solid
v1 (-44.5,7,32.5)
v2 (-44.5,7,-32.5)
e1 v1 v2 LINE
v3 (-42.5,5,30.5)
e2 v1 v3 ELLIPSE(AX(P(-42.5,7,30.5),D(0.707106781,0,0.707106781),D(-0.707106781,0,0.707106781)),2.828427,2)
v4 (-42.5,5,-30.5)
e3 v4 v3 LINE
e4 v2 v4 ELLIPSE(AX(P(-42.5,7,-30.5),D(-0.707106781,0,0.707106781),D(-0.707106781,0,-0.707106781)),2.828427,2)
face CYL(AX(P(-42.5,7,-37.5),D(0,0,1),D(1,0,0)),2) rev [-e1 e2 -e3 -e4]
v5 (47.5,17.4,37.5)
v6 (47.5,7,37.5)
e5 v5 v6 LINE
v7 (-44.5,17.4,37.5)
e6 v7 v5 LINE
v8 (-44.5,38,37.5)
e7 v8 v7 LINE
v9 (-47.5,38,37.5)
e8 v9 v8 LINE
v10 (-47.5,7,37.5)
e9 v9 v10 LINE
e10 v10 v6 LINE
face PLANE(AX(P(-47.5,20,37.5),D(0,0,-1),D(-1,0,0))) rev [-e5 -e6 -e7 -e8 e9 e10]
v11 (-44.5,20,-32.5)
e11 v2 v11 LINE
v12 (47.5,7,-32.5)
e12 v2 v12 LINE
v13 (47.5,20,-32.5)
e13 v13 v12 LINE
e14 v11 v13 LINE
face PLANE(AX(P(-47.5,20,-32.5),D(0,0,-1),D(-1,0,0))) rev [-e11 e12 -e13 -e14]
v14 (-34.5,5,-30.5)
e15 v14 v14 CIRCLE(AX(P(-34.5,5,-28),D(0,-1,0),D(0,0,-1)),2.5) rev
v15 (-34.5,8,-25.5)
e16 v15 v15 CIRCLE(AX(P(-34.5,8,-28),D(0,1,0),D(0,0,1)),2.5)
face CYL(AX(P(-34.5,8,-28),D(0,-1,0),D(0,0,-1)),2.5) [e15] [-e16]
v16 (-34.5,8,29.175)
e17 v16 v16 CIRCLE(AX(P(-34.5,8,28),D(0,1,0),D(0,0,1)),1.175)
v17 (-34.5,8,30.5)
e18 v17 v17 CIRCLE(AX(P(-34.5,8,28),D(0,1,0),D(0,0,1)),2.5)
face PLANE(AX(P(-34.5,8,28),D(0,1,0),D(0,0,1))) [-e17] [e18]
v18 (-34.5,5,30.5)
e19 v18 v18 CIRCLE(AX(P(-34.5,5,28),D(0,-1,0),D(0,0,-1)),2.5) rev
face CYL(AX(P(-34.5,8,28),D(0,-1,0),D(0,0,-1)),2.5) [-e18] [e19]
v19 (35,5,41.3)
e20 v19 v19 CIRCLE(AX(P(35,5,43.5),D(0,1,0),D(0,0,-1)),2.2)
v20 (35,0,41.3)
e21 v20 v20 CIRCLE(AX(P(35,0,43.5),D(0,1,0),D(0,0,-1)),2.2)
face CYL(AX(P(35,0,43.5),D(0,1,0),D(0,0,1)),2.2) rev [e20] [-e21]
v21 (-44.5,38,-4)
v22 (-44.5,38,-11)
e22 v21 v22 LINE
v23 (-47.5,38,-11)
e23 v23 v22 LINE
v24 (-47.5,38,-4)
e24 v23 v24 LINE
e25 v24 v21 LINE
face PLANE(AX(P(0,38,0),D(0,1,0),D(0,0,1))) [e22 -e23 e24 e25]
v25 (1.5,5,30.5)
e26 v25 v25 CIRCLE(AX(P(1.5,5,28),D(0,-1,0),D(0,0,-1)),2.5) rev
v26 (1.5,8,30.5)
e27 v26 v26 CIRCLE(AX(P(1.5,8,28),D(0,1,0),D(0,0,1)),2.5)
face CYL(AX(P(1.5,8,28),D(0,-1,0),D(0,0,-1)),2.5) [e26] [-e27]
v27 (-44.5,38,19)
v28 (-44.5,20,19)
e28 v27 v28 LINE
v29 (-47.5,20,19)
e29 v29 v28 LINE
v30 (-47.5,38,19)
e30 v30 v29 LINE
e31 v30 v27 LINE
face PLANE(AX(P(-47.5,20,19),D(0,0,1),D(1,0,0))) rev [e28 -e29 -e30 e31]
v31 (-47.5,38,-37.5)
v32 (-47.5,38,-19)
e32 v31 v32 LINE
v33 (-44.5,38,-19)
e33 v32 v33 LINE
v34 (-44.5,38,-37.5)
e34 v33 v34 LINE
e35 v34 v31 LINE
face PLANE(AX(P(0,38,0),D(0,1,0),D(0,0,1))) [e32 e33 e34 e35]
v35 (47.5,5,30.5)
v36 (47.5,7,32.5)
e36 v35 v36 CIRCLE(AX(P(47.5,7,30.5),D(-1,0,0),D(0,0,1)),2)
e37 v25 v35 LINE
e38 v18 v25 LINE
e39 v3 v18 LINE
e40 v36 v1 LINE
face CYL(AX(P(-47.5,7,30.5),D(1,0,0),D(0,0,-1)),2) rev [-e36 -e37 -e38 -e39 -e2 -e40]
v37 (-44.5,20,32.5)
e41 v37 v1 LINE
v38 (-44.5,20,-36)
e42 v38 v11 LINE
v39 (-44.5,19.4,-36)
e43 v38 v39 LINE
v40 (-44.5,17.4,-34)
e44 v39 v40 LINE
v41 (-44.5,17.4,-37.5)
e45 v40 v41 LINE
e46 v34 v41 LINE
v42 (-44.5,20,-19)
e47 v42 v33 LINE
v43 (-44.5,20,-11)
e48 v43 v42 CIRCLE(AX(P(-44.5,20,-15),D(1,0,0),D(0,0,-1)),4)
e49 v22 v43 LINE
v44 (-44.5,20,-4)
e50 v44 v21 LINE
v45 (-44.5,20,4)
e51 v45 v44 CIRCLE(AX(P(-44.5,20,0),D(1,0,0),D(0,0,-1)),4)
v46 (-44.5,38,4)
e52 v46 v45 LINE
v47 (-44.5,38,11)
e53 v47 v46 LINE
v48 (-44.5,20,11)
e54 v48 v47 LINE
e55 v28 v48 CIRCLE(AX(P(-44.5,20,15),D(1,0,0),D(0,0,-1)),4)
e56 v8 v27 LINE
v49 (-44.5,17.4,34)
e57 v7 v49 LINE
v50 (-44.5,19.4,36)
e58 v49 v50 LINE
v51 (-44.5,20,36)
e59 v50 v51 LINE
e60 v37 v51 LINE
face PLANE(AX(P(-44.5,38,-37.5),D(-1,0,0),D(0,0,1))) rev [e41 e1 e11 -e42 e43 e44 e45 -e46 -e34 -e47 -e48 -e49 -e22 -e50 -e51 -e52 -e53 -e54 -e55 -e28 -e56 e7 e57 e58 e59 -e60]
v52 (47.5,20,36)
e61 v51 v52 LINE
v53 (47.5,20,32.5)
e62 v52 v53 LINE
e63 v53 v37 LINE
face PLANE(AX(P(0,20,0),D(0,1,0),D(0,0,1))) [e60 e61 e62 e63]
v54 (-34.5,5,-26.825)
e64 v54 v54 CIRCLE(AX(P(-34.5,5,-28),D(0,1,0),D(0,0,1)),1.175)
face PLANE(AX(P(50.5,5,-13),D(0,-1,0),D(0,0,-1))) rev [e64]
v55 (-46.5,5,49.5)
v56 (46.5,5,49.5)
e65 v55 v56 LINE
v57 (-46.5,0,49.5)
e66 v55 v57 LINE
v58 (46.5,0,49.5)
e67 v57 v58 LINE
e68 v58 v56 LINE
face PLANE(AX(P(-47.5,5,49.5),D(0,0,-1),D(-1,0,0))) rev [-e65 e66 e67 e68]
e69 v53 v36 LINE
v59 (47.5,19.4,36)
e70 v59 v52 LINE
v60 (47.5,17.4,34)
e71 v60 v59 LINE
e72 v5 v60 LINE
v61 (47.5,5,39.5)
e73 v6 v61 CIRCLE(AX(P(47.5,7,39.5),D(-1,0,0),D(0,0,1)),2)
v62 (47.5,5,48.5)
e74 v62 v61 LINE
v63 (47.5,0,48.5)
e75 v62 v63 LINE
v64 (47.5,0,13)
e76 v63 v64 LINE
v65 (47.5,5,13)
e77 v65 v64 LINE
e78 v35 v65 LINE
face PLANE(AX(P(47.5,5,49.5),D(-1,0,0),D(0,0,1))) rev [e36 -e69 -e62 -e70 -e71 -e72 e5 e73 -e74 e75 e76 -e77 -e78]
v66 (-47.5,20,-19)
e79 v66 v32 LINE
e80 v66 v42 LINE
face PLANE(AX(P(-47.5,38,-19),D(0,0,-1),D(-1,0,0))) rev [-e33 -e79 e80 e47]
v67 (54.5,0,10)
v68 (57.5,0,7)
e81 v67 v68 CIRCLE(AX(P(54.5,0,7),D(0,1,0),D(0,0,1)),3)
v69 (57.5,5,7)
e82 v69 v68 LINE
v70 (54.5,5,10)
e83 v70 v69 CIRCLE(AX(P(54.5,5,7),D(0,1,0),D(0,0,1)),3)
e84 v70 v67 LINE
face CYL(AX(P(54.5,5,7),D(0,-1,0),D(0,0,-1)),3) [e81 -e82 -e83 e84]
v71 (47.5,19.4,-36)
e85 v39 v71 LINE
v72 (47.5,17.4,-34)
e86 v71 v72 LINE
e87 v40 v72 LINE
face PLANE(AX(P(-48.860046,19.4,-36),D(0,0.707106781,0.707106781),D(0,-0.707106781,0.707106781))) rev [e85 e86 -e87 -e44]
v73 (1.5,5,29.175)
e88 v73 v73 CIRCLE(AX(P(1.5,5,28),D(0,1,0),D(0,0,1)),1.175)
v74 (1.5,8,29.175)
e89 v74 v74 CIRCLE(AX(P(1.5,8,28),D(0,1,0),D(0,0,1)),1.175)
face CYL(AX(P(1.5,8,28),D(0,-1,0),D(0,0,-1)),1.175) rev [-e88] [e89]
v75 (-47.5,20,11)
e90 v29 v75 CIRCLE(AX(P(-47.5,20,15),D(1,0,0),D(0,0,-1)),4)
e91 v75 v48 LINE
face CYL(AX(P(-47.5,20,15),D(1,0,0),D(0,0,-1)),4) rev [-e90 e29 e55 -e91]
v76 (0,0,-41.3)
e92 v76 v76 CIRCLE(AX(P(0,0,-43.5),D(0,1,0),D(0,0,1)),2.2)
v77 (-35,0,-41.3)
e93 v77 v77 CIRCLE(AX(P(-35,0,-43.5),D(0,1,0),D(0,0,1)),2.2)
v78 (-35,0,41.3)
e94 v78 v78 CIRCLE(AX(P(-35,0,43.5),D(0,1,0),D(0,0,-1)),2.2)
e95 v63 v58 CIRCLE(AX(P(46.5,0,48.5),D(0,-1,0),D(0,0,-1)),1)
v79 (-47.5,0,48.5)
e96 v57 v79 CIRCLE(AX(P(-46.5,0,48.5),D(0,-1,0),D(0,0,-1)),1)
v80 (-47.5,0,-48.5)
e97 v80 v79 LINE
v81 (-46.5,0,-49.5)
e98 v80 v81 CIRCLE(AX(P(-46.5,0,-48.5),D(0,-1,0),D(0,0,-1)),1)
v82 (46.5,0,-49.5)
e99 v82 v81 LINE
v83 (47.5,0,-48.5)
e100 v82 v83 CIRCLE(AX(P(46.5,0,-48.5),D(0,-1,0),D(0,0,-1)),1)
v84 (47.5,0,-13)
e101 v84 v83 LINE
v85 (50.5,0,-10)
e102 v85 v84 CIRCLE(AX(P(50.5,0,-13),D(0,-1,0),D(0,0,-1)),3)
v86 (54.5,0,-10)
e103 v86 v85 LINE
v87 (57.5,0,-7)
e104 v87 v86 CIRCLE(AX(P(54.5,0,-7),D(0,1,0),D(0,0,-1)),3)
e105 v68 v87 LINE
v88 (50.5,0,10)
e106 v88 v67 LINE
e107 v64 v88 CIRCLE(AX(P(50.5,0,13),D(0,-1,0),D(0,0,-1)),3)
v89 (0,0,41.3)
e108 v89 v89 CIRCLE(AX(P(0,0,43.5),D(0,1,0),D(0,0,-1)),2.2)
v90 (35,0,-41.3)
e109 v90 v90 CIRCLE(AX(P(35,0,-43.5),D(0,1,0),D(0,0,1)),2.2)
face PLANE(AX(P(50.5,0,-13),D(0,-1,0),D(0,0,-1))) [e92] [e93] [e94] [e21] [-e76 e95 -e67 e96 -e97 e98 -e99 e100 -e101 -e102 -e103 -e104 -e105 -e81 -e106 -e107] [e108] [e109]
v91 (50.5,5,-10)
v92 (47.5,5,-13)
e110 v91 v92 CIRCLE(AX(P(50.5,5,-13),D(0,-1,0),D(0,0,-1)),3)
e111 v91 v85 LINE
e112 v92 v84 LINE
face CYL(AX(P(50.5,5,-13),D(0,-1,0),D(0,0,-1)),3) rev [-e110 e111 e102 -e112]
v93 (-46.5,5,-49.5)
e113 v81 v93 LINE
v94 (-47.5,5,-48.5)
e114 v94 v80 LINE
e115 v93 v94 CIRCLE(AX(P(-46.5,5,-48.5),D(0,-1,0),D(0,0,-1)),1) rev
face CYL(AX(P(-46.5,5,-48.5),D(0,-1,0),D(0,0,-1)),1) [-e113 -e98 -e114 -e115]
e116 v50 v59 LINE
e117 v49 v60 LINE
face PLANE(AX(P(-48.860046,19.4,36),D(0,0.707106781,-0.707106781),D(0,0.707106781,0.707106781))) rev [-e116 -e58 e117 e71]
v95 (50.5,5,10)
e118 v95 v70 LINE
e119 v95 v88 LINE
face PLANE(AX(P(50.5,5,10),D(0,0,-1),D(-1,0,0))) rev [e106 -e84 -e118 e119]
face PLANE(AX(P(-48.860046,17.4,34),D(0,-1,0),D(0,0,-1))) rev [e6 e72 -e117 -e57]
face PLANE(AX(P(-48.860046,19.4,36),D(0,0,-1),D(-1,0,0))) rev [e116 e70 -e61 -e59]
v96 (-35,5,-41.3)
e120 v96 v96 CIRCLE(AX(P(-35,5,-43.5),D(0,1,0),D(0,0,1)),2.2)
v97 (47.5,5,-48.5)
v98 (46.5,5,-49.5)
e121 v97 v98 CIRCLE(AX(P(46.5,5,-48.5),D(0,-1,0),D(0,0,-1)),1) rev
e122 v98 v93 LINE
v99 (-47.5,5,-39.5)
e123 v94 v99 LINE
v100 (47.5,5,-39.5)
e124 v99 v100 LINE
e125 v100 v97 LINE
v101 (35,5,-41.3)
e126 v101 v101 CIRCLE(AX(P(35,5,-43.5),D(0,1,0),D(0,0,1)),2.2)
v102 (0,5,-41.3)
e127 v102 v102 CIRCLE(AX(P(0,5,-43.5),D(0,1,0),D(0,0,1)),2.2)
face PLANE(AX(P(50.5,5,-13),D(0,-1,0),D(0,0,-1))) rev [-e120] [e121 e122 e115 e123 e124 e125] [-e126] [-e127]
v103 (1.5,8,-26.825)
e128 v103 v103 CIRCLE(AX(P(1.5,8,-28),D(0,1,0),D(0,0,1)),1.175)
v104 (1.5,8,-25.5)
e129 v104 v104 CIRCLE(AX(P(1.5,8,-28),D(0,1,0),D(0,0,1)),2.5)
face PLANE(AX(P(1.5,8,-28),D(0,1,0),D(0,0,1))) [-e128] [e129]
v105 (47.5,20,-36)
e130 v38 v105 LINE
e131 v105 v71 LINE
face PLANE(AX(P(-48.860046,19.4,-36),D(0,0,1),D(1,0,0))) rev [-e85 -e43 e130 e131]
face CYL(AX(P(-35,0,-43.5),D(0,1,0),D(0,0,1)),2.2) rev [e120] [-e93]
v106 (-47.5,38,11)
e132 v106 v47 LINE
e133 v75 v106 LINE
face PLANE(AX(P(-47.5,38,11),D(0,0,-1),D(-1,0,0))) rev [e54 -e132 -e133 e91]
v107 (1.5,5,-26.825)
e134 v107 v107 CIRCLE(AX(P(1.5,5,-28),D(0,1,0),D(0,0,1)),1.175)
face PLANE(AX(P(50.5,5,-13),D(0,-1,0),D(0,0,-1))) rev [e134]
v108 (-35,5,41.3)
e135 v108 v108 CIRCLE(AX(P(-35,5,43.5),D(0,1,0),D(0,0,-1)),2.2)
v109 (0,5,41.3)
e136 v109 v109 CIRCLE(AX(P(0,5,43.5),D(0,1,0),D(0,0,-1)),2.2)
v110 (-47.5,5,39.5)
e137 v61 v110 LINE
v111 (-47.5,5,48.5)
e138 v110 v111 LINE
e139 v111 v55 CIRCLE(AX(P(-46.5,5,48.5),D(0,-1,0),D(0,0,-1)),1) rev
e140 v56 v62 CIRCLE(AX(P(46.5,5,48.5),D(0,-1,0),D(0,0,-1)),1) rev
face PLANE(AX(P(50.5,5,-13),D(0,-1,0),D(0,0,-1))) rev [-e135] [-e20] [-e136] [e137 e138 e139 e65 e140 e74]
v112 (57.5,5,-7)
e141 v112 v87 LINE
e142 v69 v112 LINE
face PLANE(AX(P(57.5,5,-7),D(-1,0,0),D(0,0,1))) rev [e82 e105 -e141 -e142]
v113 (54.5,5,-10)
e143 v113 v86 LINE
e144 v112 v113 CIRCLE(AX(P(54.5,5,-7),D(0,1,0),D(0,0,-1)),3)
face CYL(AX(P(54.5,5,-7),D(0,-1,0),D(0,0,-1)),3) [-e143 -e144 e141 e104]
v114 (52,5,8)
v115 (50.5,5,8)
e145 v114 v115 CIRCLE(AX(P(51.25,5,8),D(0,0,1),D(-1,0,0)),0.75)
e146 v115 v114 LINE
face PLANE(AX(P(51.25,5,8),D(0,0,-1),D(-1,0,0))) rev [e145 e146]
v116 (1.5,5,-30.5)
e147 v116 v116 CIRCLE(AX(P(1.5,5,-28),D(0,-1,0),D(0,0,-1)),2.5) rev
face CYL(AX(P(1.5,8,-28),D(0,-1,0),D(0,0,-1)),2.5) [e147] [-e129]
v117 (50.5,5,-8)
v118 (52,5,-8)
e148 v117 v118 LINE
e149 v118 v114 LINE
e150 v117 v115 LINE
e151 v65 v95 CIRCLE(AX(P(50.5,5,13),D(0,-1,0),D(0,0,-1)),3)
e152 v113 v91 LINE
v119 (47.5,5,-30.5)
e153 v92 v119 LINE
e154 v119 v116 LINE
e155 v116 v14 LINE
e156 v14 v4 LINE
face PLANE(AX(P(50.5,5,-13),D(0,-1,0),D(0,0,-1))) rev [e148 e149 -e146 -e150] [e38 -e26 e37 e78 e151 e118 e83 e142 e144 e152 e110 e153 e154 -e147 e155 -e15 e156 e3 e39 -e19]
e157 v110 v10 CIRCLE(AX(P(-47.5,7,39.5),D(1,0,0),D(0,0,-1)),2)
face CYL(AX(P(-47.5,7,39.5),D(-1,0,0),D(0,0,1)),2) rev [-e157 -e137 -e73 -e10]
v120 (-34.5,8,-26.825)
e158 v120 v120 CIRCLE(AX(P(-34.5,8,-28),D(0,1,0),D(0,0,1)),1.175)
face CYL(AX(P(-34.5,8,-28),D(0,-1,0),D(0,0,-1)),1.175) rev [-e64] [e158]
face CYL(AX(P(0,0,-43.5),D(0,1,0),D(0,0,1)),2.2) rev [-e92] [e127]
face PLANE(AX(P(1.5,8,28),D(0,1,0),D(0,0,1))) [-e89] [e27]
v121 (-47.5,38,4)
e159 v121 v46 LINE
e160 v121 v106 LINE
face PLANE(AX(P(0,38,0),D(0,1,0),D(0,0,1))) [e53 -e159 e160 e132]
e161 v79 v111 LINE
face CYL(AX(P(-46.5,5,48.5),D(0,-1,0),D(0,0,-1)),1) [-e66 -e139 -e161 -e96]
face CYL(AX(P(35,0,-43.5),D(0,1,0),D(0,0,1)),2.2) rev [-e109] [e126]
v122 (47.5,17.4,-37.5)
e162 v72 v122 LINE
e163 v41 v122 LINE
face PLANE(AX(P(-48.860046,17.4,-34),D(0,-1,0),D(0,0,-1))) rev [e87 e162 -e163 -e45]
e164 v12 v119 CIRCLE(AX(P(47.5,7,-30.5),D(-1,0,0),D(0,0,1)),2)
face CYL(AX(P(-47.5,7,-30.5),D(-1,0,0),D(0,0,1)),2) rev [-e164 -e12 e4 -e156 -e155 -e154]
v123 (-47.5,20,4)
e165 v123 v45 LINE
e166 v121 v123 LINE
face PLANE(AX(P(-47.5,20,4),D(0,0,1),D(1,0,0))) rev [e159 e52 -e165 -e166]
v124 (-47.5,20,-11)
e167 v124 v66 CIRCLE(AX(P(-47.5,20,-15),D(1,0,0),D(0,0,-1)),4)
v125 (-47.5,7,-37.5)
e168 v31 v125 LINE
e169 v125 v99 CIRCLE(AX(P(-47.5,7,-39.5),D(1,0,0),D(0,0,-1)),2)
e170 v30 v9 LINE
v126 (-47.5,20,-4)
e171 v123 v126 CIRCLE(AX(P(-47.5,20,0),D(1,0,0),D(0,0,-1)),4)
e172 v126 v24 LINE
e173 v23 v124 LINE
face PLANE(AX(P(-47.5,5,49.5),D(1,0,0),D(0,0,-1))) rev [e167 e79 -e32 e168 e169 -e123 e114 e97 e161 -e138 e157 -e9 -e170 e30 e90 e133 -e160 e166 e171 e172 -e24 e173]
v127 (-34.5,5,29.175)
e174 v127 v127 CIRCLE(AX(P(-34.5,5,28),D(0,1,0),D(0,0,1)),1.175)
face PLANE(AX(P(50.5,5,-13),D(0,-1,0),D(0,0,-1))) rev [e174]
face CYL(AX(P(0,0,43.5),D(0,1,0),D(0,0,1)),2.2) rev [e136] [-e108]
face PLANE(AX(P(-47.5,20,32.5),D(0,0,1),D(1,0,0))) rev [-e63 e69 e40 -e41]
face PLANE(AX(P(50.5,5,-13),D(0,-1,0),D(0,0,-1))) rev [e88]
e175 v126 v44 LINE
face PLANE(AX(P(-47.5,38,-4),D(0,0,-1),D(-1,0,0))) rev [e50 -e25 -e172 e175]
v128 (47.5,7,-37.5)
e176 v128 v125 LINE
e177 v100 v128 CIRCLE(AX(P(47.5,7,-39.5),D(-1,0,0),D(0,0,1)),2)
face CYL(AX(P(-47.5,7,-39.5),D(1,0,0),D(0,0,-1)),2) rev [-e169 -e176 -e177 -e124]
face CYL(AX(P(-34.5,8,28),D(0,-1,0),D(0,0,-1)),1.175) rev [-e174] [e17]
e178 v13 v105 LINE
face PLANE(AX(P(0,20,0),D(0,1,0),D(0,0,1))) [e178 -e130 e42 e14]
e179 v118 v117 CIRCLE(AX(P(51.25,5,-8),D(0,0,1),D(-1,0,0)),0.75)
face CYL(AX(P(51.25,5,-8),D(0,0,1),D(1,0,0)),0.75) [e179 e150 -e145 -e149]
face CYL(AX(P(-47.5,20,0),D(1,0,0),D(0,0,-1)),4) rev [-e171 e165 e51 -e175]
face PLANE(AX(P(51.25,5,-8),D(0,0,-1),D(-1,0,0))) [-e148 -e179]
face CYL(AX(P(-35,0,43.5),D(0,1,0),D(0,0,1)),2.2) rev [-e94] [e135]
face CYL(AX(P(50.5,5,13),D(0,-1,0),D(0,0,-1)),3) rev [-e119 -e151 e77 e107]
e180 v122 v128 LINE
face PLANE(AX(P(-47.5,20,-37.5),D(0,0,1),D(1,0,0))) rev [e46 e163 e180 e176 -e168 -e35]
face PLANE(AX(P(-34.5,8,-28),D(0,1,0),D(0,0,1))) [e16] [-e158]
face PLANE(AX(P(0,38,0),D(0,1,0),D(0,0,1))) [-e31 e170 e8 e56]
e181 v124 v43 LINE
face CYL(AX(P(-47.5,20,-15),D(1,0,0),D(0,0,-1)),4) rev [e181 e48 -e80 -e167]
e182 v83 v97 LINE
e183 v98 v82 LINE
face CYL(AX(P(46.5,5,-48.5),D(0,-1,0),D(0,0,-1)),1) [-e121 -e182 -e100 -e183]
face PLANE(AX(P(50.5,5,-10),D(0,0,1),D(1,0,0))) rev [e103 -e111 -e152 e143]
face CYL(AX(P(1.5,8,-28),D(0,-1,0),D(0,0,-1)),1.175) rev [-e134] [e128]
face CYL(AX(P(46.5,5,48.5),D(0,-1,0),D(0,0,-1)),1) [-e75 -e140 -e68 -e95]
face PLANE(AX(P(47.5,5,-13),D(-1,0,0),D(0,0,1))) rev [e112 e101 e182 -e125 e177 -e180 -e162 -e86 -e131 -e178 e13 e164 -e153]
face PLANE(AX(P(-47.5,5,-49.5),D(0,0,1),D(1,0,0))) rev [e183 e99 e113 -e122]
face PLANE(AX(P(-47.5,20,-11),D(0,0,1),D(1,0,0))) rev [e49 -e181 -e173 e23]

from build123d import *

# Parameters (mm, degrees)
BOSS_EXTRUDE1_DEPTH = 5
SKETCH2_W           = 95
SKETCH2_H           = 5
BOSS_EXTRUDE2_DEPTH = 15
SKETCH3_W           = 3
SKETCH3_H           = 75
BOSS_EXTRUDE3_DEPTH = 33
SKETCH4_R           = 2.5
SKETCH4_R_2         = 1.175
BOSS_EXTRUDE4_DEPTH = 3
CUT_EXTRUDE1_DEPTH  = 120.57529009
SKETCH6_R           = 2.2
CUT_EXTRUDE2_DEPTH  = 83.737536826
CUT_EXTRUDE3_DEPTH  = 92
FILLET1_R           = 1
FILLET2_R           = 2
BOSS_EXTRUDE5_START = -2
BOSS_EXTRUDE5_DEPTH = 16


with BuildPart() as part:
    # Sketch1 → Boss-Extrude1 (new body)
    with BuildSketch(Plane(origin=(0, 0, 0), x_dir=(1, 0, 0), z_dir=(0, 1, 0))):
        with BuildLine():
            Line((47.5, 13), (47.5, 49.5))
            Line((47.5, 49.5), (-47.5, 49.5))
            Line((-47.5, 49.5), (-47.5, -49.5))
            Line((-47.5, -49.5), (47.5, -49.5))
            Line((47.5, -49.5), (47.5, -13))
            ThreePointArc((47.5, -13), (48.378679656, -10.878679656), (50.5, -10))
            Line((50.5, -10), (54.5, -10))
            ThreePointArc((54.5, -10), (56.621320344, -9.121320344), (57.5, -7))
            Line((57.5, -7), (57.5, 7))
            ThreePointArc((57.5, 7), (56.621320344, 9.121320344), (54.5, 10))
            Line((54.5, 10), (50.5, 10))
            ThreePointArc((50.5, 10), (48.378679656, 10.878679656), (47.5, 13))
        make_face()
    extrude(amount=BOSS_EXTRUDE1_DEPTH)

    # Sketch2 → Boss-Extrude2 (add)
    with BuildSketch(Plane(origin=(0, 5, 0), x_dir=(1, 0, 0), z_dir=(0, 1, 0))):
        with Locations((0, 35)):
            Rectangle(SKETCH2_W, SKETCH2_H)
        with Locations((0, -35)):
            Rectangle(SKETCH2_W, SKETCH2_H)
    extrude(amount=BOSS_EXTRUDE2_DEPTH)

    # Sketch3 → Boss-Extrude3 (add)
    with BuildSketch(Plane(origin=(0, 5, 0), x_dir=(1, 0, 0), z_dir=(0, 1, 0))):
        with Locations((-46, 0)):
            Rectangle(SKETCH3_W, SKETCH3_H)
    extrude(amount=BOSS_EXTRUDE3_DEPTH)

    # Sketch4 → Boss-Extrude4 (add)
    # profile 1 of 4: a face of its own
    with BuildSketch(Plane(origin=(0, 5, 0), x_dir=(1, 0, 0), z_dir=(0, 1, 0))):
        with Locations(Location((-34.5, 28, 0), (0, 0, 90))):
            Circle(SKETCH4_R)
        with Locations(Location((-34.5, 28, 0), (0, 0, 270))):
            Circle(SKETCH4_R_2, mode=Mode.SUBTRACT)
    # profile 2 of 4: a face of its own
    with BuildSketch(Plane(origin=(0, 5, 0), x_dir=(1, 0, 0), z_dir=(0, 1, 0))):
        with Locations(Location((-34.5, -28, 0), (0, 0, 90))):
            Circle(SKETCH4_R)
        with Locations(Location((-34.5, -28, 0), (0, 0, 270))):
            Circle(SKETCH4_R_2, mode=Mode.SUBTRACT)
    # profile 3 of 4: a face of its own
    with BuildSketch(Plane(origin=(0, 5, 0), x_dir=(1, 0, 0), z_dir=(0, 1, 0))):
        with Locations(Location((1.5, 28, 0), (0, 0, 90))):
            Circle(SKETCH4_R)
        with Locations(Location((1.5, 28, 0), (0, 0, 270))):
            Circle(SKETCH4_R_2, mode=Mode.SUBTRACT)
    # profile 4 of 4: a face of its own
    with BuildSketch(Plane(origin=(0, 5, 0), x_dir=(1, 0, 0), z_dir=(0, 1, 0))):
        with Locations(Location((1.5, -28, 0), (0, 0, 90))):
            Circle(SKETCH4_R)
        with Locations(Location((1.5, -28, 0), (0, 0, 270))):
            Circle(SKETCH4_R_2, mode=Mode.SUBTRACT)
    extrude(amount=BOSS_EXTRUDE4_DEPTH)

    # Sketch5 → Cut-Extrude1 (cut, through all)
    with BuildSketch(Plane(origin=(-44.5, 0, 0), x_dir=(0, 0, -1), z_dir=(1, 0, 0))):
        with BuildLine():
            Line((-19, 20), (-19, 38))
            Line((-19, 38), (-11, 38))
            Line((-11, 38), (-11, 20))
            ThreePointArc((-11, 20), (-15, 16), (-19, 20))
        make_face()
        with BuildLine():
            Line((-4, 20), (-4, 38))
            Line((-4, 38), (4, 38))
            Line((4, 38), (4, 20))
            ThreePointArc((4, 20), (0, 16), (-4, 20))
        make_face()
        with BuildLine():
            Line((11, 20), (11, 38))
            Line((11, 38), (19, 38))
            Line((19, 38), (19, 20))
            ThreePointArc((19, 20), (15, 16), (11, 20))
        make_face()
    extrude(amount=-CUT_EXTRUDE1_DEPTH, mode=Mode.SUBTRACT)

    # Sketch6 → Cut-Extrude2 (cut, through all)
    with BuildSketch(Plane(origin=(0, 5, 0), x_dir=(1, 0, 0), z_dir=(0, 1, 0))):
        with Locations(Location((-35, 43.5, 0), (0, 0, 270))):
            Circle(SKETCH6_R)
        with Locations(Location((0, 43.5, 0), (0, 0, 270))):
            Circle(SKETCH6_R)
        with Locations(Location((35, 43.5, 0), (0, 0, 270))):
            Circle(SKETCH6_R)
        with Locations(Location((35, -43.5, 0), (0, 0, 90))):
            Circle(SKETCH6_R)
        with Locations(Location((0, -43.5, 0), (0, 0, 90))):
            Circle(SKETCH6_R)
        with Locations(Location((-35, -43.5, 0), (0, 0, 90))):
            Circle(SKETCH6_R)
    extrude(amount=-CUT_EXTRUDE2_DEPTH, mode=Mode.SUBTRACT)

    # Sketch7 → Cut-Extrude3 (cut)
    with BuildSketch(Plane(origin=(47.5, 0, 0), x_dir=(0, 0, -1), z_dir=(1, 0, 0))):
        Polygon((-36, 19.4), (-34, 17.4), (-37.5, 17.4), (-37.5, 20), (-36, 20), align=None)
        Polygon((37.5, 20), (37.5, 17.4), (34, 17.4), (36, 19.4), (36, 20), align=None)
    extrude(amount=-CUT_EXTRUDE3_DEPTH, mode=Mode.SUBTRACT)

    # Fillet1
    fillet1_edges = [part.edges().sort_by_distance(p)[0] for p in [
        (47.5, 2.5, -49.5),
        (47.5, 2.5, 49.5),
        (-47.5, 2.5, 49.5),
        (-47.5, 2.5, -49.5),
    ]]
    fillet(fillet1_edges, radius=FILLET1_R)

    # Fillet2
    fillet2_edges = [part.edges().sort_by_distance(p)[0] for p in [
        (0, 5, -37.5),
        (1.5, 5, 32.5),
        (0, 5, 37.5),
        (1.5, 5, -32.5),
        (-44.5, 5, 0),
    ]]
    fillet(fillet2_edges, radius=FILLET2_R - 0.0001)  # a hair under: the kernel refuses the full size

    # Sketch9 → Boss-Extrude5 (add)
    with BuildSketch(Plane.XY.offset(10).offset(BOSS_EXTRUDE5_START)):
        with BuildLine():
            Line((50.5, 5), (52, 5))
            ThreePointArc((52, 5), (51.25, 5.75), (50.5, 5))
        make_face()
    extrude(amount=-BOSS_EXTRUDE5_DEPTH)


solid = part.part
